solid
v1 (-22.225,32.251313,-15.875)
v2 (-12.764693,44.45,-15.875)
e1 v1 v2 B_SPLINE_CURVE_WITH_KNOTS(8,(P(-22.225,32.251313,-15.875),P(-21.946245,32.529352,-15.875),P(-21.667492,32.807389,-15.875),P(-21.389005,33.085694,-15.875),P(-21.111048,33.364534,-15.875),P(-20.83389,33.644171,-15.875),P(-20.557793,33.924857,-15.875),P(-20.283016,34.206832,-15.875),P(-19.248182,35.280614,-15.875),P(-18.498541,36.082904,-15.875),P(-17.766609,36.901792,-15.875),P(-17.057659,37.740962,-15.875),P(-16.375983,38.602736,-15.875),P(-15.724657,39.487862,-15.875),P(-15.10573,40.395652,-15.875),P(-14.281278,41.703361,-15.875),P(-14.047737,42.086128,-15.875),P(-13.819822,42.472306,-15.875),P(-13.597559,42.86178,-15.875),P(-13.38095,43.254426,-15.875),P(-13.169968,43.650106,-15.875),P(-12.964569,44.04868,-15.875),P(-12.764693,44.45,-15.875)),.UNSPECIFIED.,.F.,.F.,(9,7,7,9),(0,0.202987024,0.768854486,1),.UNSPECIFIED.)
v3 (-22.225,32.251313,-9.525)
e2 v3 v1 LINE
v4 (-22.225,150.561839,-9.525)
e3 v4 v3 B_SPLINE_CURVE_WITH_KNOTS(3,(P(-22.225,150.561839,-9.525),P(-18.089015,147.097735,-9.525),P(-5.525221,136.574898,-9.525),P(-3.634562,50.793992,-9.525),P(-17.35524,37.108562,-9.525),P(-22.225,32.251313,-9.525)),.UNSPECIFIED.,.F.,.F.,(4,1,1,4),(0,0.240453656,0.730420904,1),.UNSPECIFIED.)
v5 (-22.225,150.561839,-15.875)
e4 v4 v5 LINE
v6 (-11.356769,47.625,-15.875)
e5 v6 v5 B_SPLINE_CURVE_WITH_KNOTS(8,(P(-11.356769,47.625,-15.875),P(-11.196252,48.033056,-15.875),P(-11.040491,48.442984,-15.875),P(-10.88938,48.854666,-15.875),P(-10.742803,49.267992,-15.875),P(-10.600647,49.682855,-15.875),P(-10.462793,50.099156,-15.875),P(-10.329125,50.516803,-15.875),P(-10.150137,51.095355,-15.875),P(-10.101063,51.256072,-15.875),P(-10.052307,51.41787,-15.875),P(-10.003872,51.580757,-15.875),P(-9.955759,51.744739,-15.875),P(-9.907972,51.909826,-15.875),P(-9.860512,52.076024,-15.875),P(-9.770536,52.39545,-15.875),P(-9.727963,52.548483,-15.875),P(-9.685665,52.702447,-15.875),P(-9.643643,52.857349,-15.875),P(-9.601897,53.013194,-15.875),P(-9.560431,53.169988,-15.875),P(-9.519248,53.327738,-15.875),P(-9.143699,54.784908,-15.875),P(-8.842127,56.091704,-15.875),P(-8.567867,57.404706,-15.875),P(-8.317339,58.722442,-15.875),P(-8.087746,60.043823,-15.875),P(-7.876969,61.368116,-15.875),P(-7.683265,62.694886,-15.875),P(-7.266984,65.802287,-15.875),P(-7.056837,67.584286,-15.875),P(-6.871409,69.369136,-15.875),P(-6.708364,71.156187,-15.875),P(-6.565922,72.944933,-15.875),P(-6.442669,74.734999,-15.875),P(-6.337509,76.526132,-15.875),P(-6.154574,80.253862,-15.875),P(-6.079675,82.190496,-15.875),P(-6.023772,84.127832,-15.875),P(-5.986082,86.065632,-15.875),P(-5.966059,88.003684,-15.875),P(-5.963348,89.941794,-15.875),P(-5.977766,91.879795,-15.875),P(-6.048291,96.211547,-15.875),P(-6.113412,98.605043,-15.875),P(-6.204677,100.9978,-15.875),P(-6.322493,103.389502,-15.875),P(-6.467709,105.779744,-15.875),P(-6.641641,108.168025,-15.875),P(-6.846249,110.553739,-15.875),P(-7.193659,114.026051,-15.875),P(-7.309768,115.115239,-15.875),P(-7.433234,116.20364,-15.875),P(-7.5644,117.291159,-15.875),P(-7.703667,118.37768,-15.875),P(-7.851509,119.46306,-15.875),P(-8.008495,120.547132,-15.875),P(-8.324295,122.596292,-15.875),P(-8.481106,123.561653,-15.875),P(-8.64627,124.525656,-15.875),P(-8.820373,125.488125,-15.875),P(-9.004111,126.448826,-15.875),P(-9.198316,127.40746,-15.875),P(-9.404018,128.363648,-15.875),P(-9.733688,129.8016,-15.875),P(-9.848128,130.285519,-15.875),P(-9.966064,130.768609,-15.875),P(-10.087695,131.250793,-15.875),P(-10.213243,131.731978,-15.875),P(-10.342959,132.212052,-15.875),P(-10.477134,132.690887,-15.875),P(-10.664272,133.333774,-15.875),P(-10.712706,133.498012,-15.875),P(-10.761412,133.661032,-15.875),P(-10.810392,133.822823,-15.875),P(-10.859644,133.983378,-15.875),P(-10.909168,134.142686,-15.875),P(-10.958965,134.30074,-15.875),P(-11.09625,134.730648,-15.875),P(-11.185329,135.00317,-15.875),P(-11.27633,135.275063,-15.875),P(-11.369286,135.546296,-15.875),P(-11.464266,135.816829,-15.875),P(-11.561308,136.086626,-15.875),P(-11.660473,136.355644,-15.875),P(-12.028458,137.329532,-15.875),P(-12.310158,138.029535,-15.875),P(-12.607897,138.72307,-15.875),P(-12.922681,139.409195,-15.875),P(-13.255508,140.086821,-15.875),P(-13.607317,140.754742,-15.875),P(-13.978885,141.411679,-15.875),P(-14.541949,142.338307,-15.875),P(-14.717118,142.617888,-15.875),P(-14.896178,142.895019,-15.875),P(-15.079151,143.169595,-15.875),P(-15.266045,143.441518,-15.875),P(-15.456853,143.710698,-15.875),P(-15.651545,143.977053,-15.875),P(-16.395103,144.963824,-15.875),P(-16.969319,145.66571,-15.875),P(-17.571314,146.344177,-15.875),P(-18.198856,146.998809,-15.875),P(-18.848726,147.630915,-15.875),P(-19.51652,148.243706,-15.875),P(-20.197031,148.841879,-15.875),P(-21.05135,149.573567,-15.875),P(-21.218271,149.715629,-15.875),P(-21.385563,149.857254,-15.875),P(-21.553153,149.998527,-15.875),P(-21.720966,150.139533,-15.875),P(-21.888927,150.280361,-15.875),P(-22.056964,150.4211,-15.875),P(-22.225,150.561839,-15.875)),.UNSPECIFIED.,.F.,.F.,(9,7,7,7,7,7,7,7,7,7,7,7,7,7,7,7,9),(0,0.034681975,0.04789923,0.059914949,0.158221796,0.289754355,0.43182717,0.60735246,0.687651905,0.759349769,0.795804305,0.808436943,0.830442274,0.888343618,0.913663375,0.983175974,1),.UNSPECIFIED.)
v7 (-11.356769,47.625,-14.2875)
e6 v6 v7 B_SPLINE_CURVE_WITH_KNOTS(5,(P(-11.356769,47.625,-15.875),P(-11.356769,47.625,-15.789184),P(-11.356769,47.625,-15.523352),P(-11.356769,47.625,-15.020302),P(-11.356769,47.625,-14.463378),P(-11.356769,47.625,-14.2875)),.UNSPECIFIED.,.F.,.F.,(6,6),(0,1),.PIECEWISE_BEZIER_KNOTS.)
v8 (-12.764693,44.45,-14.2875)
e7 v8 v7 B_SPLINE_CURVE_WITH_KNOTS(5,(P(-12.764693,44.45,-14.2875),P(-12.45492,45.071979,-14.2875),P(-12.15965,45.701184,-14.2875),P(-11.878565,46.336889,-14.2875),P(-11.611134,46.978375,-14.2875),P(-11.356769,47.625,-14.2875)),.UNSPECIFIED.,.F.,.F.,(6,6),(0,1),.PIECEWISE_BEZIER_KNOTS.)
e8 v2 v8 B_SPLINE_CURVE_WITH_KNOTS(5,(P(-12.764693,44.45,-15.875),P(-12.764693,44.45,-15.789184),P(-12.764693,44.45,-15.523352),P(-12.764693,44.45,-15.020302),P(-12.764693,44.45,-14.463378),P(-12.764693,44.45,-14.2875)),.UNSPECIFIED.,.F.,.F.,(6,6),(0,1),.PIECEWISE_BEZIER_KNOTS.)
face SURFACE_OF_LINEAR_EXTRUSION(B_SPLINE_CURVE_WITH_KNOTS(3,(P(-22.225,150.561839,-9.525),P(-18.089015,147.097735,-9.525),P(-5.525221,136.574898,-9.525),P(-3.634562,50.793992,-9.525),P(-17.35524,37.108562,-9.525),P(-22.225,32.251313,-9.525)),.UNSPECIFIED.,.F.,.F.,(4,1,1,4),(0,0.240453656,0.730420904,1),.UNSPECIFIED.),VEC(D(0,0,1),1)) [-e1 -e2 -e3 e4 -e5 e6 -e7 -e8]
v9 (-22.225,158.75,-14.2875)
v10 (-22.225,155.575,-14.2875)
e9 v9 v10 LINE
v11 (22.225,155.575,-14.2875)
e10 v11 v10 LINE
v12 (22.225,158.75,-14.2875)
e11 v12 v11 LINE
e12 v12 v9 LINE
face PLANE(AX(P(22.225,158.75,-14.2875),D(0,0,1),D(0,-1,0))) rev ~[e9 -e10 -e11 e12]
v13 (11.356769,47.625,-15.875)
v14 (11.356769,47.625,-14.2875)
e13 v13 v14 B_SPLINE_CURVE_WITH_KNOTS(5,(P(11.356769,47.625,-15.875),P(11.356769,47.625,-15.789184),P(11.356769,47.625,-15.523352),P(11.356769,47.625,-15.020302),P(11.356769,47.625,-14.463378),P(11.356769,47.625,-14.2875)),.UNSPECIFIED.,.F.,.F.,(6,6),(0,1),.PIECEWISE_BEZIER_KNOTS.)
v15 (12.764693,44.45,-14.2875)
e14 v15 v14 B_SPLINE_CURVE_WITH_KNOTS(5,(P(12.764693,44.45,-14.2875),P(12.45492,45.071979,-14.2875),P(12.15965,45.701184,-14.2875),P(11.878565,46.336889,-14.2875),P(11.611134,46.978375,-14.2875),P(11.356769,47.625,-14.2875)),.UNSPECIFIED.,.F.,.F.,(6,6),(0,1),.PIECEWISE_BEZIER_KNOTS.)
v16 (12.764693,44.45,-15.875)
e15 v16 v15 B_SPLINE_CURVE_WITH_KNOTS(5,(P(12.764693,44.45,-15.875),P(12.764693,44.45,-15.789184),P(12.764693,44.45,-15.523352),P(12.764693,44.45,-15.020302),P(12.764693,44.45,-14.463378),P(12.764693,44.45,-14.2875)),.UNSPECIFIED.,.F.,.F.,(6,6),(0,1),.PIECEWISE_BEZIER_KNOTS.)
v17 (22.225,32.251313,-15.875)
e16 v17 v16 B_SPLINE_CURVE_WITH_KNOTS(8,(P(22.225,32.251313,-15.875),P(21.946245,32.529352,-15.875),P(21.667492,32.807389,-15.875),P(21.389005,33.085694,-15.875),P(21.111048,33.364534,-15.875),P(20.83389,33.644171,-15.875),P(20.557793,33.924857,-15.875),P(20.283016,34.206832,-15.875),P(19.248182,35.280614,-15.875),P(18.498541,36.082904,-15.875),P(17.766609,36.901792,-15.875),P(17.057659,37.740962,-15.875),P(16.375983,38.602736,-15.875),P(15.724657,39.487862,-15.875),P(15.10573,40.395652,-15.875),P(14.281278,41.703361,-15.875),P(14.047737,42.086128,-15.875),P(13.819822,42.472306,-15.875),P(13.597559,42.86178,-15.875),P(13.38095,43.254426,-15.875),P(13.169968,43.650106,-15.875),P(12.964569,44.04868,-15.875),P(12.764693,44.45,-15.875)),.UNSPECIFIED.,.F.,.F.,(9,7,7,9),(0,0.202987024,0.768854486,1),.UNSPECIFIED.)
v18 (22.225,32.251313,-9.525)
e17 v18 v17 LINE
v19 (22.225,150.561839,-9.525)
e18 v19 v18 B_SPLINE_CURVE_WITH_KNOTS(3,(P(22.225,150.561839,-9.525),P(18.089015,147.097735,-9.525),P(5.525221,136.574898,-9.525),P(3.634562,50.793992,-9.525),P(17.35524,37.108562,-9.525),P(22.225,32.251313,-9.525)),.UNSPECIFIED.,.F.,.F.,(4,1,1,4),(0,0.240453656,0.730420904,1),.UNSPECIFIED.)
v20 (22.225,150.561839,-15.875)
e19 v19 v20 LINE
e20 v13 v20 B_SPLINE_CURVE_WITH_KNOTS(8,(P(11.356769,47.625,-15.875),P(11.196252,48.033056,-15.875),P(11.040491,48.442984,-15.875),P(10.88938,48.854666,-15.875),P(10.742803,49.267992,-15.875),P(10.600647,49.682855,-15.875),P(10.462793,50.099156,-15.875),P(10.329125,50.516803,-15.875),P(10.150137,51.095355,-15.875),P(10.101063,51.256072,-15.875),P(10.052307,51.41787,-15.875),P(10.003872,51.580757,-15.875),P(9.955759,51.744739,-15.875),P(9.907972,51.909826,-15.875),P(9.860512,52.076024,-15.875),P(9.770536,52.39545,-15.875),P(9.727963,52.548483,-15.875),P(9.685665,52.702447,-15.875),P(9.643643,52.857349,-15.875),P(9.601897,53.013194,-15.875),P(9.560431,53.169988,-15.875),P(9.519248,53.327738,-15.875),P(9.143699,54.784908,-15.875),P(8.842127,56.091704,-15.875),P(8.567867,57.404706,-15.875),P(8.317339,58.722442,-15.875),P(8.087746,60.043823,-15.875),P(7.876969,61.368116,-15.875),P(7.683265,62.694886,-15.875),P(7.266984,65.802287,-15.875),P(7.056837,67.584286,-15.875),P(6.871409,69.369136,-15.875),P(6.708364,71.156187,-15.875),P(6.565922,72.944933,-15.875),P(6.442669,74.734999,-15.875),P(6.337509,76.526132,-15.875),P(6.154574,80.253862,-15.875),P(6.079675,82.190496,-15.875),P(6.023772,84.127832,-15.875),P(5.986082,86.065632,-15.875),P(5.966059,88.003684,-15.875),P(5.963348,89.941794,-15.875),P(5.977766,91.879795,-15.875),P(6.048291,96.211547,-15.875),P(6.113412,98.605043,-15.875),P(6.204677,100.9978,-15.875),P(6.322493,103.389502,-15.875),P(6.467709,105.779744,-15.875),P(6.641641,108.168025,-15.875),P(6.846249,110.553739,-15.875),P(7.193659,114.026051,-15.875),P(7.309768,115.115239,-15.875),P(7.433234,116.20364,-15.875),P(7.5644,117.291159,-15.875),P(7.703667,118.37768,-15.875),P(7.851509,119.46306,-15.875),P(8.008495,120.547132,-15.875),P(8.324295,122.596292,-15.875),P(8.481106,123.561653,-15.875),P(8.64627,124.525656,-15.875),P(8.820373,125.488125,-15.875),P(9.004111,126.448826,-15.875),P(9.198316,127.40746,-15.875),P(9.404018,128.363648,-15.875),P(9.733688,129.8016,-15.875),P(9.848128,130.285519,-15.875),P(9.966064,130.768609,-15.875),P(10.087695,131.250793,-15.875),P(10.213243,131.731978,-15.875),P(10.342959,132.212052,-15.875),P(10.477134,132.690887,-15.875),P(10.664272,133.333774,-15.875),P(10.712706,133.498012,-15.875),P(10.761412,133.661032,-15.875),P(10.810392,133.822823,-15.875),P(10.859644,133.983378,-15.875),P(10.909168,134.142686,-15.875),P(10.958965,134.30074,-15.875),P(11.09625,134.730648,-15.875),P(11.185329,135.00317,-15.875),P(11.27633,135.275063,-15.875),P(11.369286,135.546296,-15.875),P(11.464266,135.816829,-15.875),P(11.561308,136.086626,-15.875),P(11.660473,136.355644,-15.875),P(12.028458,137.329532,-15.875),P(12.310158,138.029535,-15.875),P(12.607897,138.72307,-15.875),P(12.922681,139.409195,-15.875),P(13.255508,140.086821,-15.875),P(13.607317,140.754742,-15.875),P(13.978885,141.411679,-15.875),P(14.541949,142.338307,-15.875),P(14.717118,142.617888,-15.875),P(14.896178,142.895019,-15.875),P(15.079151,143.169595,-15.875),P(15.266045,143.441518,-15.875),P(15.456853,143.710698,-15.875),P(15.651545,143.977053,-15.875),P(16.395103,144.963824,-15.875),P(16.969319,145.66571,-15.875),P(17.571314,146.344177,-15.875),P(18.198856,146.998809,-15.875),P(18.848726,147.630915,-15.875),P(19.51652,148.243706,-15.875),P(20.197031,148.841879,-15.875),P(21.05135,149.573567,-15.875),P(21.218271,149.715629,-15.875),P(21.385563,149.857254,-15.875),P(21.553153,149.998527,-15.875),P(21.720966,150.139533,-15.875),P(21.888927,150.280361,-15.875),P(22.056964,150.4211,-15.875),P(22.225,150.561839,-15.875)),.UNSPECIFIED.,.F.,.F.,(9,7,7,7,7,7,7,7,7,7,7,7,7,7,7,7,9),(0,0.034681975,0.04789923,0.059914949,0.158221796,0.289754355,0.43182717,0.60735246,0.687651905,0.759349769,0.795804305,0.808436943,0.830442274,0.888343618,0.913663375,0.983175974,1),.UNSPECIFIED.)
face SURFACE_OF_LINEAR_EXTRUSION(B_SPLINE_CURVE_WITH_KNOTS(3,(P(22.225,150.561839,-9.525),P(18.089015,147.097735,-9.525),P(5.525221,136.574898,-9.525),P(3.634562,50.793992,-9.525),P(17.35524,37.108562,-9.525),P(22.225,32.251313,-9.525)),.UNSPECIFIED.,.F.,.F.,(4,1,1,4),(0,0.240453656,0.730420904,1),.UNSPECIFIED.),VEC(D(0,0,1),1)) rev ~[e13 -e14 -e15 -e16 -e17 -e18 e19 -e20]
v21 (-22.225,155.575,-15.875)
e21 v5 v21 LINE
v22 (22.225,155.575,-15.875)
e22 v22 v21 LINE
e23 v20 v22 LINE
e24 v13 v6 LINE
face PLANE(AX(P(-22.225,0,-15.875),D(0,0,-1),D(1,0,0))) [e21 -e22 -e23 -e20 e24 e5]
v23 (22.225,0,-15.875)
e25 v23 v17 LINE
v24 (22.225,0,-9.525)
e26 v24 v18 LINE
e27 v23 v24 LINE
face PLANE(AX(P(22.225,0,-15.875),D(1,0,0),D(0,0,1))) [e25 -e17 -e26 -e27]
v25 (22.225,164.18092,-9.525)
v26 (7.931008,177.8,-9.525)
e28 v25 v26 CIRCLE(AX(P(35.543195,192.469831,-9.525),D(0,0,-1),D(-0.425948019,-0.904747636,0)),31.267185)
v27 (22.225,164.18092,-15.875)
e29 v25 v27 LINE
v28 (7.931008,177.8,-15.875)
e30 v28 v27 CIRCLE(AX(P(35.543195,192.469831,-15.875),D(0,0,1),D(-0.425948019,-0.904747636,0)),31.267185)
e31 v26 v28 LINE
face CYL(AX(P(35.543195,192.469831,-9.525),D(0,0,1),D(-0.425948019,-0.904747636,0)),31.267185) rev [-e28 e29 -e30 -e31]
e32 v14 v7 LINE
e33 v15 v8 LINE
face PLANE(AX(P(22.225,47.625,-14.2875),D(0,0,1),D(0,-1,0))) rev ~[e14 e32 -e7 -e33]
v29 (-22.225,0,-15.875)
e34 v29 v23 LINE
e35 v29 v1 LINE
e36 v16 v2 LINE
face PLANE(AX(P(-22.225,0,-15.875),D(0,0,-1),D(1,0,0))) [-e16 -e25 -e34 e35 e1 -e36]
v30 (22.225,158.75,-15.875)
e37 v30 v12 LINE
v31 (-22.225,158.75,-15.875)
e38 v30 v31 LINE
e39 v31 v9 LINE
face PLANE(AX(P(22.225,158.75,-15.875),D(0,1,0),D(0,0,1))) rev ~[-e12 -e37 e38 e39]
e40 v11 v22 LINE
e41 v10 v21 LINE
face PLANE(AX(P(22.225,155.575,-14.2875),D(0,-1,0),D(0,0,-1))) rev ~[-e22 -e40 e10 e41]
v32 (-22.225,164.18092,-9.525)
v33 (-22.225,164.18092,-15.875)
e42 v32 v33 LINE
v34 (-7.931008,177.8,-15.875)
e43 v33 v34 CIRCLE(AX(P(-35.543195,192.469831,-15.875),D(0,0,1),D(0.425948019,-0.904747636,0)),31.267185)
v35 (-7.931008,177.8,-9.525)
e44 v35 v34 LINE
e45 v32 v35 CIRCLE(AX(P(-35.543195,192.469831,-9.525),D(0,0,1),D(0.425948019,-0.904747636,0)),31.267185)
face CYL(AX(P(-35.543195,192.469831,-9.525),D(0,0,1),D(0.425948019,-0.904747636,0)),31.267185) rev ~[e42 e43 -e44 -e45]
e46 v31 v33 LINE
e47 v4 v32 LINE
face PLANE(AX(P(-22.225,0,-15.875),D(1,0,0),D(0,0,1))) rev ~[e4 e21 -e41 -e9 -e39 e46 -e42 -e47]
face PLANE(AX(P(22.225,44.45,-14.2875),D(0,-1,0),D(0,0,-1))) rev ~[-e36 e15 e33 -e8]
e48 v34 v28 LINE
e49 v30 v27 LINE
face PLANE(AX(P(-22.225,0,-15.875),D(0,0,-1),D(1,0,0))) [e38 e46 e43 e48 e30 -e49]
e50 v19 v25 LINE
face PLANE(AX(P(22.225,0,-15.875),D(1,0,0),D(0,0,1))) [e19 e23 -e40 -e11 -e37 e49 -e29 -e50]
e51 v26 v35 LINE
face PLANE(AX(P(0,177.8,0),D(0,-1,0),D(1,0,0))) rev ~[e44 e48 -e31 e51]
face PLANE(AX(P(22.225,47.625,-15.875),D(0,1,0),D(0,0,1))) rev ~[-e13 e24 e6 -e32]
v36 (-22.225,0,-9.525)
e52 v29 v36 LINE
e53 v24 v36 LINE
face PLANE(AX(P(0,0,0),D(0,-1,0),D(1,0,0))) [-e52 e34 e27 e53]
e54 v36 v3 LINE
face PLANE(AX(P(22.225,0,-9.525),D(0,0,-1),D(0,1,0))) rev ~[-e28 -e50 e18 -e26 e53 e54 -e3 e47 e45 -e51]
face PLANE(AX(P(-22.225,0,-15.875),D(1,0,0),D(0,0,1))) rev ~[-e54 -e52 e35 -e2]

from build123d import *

# Parameters (mm, degrees)
F0_W     = 44.45
F0_H     = 31.75
F1_DEPTH = 177.8
F3_DEPTH = 44.451
F4_W     = 177.8
F4_H     = 25.4
F5_DEPTH = 66.04
F7_DEPTH = 25.4
F9_DEPTH = 25.4


# Not quite as in the source:
# - a pattern or mirror of a feature is missing from the dataset's text; its kind, count and spacing are read off the source's solid


with BuildPart() as f1:
    # F0 (on Front) → F1 (new body)
    with BuildSketch(Plane.XZ):
        Rectangle(F0_W, F0_H)
    extrude(amount=-F1_DEPTH)

    # F2 (on face) → F3 (cut, through all)
    with BuildSketch(Plane.YZ.offset(22.225)):
        with BuildLine():
            ThreePointArc((46.0375, -14.2875), (44.9149679849, -14.7524679849), (44.45, -15.875))
            Line((44.45, -15.875), (47.625, -15.875))
            ThreePointArc((47.625, -15.875), (47.1600320151, -14.7524679849), (46.0375, -14.2875))
        make_face()
        with BuildLine():
            ThreePointArc((46.0375, -14.2875), (47.1600320151, -14.7524679849), (47.625, -15.875))
            Line((47.625, -15.875), (47.625, -14.2875))
            Line((47.625, -14.2875), (46.0375, -14.2875))
        make_face()
        with BuildLine():
            Line((44.45, -14.2875), (44.45, -15.875))
            ThreePointArc((44.45, -15.875), (44.9149679849, -14.7524679849), (46.0375, -14.2875))
            Line((46.0375, -14.2875), (44.45, -14.2875))
        make_face()
        with BuildLine():
            ThreePointArc((157.1625, -14.2875), (156.0399679849, -14.7524679849), (155.575, -15.875))
            Line((155.575, -15.875), (158.75, -15.875))
            ThreePointArc((158.75, -15.875), (158.2850320151, -14.7524679849), (157.1625, -14.2875))
        make_face()
        with BuildLine():
            ThreePointArc((157.1625, -14.2875), (158.2850320151, -14.7524679849), (158.75, -15.875))
            Line((158.75, -15.875), (158.75, -14.2875))
            Line((158.75, -14.2875), (157.1625, -14.2875))
        make_face()
        with BuildLine():
            Line((155.575, -14.2875), (155.575, -15.875))
            ThreePointArc((155.575, -15.875), (156.0399679849, -14.7524679849), (157.1625, -14.2875))
            Line((157.1625, -14.2875), (155.575, -14.2875))
        make_face()
    extrude(amount=-F3_DEPTH, mode=Mode.SUBTRACT)

    # F4 (on face) → F5 (cut)
    with BuildSketch(Plane.YZ.offset(22.225)):
        with Locations((88.9, 3.175)):
            Rectangle(F4_W, F4_H)
    extrude(amount=-F5_DEPTH, mode=Mode.SUBTRACT)

    # F6 (on face) → F7 (cut)
    with BuildSketch(Plane.XY.offset(-9.525)):
        with BuildLine():
            add(Edge.make_bspline(
                [(-22.225, 150.5618393421), (-18.0890147105, 147.097734562), (-5.5252210375, 136.5748978803), (-3.6345620333, 50.7939916857), (-17.3552404375, 37.108562276), (-22.225, 32.2513133287)],
                knots=[0, 0, 0, 0, 0.2404536555, 0.7304209045, 1, 1, 1, 1], degree=3))
            Line((-22.225, 150.5618393421), (-22.225, 32.2513133287))
        make_face()
        with BuildLine():
            Line((22.225, 32.2513133287), (22.225, 150.5618393421))
            add(Edge.make_bspline(
                [(22.225, 150.5618393421), (18.0890147105, 147.097734562), (5.5252210375, 136.5748978803), (3.6345620333, 50.7939916857), (17.3552404375, 37.108562276), (22.225, 32.2513133287)],
                knots=[0, 0, 0, 0, 0.2404536555, 0.7304209045, 1, 1, 1, 1], degree=3))
        make_face()
    extrude(amount=-F7_DEPTH, mode=Mode.SUBTRACT)

    # F8 (on face) → F9 (cut)
    with BuildSketch(Plane.XY.offset(-9.525)):
        with BuildLine():
            Line((-22.225, 177.8), (-22.225, 164.1809196711))
            ThreePointArc((-22.225, 164.1809196711), (-13.9748413511, 169.8326284901), (-7.9310080037, 177.8))
            Line((-7.9310080037, 177.8), (-22.225, 177.8))
        make_face()
    f9 = extrude(amount=-F9_DEPTH, mode=Mode.SUBTRACT)

    # F9_copies: F9 across plane
    add(f9.mirror(Plane(origin=(0, 0, 0), x_dir=(0, 0, 1), z_dir=(1, 0, 0))), mode=Mode.SUBTRACT)


solid = f1.part
